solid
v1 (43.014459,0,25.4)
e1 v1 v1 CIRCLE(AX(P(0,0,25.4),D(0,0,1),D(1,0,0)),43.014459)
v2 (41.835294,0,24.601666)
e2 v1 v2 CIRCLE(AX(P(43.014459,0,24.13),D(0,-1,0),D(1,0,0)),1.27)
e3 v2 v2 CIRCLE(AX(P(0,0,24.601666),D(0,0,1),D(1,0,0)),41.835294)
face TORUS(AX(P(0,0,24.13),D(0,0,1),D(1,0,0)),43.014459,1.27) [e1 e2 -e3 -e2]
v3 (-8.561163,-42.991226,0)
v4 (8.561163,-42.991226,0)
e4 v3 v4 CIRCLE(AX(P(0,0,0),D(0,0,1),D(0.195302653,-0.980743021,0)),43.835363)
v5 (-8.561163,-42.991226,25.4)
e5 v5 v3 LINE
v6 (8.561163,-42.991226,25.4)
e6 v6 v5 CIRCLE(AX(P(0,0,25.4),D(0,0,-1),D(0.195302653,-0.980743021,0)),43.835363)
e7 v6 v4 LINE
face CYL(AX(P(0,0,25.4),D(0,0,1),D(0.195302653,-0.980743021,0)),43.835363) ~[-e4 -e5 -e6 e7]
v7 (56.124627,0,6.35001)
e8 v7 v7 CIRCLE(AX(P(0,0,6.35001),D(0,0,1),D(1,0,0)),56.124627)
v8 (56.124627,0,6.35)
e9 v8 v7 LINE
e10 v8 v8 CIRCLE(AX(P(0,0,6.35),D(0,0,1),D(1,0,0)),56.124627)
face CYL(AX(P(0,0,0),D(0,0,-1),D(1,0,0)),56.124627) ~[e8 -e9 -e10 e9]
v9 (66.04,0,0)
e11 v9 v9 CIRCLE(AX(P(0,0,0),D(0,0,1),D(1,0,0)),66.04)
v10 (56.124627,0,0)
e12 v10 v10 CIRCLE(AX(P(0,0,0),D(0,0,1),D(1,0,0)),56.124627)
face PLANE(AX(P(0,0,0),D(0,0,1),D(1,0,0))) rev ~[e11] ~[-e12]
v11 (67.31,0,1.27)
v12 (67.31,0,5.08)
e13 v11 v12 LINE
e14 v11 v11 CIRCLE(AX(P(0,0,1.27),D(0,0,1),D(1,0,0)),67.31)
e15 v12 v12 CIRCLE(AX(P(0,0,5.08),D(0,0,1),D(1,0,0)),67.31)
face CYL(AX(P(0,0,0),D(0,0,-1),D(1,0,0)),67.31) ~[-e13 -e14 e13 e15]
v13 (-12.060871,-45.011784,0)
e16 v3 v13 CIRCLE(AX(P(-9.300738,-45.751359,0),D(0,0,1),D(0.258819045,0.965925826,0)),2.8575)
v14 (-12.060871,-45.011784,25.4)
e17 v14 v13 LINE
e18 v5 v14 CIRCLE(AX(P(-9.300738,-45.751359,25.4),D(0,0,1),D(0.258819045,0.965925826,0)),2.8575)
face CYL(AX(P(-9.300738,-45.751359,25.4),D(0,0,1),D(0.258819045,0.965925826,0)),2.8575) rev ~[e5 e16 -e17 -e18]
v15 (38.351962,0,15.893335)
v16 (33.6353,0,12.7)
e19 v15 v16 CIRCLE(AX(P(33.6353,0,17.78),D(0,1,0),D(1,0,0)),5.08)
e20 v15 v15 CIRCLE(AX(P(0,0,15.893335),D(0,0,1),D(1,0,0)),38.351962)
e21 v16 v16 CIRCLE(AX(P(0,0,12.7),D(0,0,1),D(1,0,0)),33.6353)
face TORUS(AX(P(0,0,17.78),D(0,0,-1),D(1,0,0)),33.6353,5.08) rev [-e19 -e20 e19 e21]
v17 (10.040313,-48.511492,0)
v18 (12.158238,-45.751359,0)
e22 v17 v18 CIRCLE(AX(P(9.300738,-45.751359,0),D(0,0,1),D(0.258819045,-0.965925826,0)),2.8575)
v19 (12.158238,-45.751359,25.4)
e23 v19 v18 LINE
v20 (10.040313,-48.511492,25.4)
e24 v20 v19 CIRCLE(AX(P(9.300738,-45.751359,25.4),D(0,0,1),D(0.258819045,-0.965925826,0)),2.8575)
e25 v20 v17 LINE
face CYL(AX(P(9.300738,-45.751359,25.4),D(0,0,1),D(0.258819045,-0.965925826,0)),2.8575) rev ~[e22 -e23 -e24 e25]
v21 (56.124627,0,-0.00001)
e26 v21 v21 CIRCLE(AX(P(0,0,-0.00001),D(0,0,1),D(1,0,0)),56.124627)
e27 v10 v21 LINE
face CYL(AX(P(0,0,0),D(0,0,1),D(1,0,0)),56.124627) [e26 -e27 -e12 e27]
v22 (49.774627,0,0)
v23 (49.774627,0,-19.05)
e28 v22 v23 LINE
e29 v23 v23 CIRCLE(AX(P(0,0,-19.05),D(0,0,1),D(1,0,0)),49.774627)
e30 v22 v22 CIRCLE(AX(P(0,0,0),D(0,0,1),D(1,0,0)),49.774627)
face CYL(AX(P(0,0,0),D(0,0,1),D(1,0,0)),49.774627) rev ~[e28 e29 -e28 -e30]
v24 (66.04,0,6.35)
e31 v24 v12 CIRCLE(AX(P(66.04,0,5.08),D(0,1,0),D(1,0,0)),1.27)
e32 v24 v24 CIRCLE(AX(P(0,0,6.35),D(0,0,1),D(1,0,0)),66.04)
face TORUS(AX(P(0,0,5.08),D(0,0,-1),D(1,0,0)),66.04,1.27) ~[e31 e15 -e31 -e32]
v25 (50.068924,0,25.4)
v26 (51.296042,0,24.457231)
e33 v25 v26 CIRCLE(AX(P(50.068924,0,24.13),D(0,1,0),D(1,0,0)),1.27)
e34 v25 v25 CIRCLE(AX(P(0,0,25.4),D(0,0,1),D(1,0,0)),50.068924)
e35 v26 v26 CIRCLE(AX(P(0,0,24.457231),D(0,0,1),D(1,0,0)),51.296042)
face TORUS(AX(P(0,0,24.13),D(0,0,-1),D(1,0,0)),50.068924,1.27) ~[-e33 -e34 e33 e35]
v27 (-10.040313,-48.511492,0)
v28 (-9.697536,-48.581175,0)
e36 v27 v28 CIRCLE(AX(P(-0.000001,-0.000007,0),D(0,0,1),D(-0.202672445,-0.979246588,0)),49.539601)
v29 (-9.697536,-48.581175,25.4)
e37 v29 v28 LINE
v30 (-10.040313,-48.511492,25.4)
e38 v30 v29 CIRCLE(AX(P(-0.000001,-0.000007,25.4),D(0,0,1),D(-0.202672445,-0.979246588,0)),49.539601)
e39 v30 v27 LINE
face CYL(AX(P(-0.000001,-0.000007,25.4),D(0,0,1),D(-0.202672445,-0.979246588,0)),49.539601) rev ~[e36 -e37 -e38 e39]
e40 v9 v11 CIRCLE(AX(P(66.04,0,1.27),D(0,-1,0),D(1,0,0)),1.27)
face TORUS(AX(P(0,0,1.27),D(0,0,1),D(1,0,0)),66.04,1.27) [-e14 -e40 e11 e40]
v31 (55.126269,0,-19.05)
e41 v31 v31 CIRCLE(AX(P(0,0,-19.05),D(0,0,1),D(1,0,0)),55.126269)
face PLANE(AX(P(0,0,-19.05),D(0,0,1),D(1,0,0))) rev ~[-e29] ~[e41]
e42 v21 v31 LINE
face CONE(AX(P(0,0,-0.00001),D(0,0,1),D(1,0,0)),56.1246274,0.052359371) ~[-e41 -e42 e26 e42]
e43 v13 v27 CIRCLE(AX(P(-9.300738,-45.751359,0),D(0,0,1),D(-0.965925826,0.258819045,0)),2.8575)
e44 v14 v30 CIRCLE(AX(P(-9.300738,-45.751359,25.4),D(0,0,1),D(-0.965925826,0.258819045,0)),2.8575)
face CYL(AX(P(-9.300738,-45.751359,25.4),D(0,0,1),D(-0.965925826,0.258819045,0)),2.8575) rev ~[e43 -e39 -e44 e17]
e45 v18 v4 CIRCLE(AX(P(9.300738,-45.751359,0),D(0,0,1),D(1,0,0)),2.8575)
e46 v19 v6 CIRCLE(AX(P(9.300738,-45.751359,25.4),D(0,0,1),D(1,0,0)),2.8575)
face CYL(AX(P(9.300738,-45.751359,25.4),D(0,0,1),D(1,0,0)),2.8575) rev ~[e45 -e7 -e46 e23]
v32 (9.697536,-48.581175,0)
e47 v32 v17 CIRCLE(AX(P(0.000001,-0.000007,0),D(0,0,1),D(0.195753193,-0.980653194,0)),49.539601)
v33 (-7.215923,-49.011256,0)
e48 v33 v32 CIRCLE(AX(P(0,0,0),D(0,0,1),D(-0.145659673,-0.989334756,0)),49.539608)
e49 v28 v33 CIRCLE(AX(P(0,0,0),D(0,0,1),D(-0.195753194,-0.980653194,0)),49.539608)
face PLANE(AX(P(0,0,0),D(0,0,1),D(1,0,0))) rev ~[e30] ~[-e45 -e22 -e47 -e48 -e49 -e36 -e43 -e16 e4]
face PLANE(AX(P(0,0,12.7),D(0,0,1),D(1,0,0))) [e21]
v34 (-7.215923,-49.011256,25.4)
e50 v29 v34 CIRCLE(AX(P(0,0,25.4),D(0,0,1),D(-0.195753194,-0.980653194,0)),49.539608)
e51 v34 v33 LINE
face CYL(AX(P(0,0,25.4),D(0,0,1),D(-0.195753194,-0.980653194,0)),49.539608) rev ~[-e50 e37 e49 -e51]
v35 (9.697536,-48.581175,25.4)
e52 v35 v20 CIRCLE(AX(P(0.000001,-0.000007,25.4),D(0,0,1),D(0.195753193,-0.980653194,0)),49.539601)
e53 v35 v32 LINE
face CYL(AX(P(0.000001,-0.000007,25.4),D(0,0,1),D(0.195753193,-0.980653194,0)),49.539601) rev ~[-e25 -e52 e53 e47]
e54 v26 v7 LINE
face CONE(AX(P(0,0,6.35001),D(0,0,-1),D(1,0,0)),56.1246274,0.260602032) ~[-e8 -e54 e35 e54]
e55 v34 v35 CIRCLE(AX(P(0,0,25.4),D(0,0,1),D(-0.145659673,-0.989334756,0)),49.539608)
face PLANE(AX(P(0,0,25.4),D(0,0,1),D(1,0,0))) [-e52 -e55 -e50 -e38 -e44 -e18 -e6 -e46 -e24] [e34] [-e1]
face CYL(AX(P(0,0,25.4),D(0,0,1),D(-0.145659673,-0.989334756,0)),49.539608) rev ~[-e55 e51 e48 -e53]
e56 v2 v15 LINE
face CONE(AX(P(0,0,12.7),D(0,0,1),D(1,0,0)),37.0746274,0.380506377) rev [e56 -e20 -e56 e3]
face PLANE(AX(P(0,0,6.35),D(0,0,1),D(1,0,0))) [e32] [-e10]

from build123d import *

# Parameters (mm, degrees)
F0_R     = 67.31
F0_R_2   = 56.1246274
F1_DEPTH = 6.35
F0_R_3   = 49.7746274
F2_DEPTH = 19.05
F0_R_4   = 43.4246274
F0_R_5   = 37.0746274
F3_DEPTH = 25.4
F4_SIZE2 = 0.998358
F4_SIZE  = 19.04999
F5_SIZE2 = 19.04999
F5_SIZE  = 5.07999
F6_SIZE2 = 12.7
F6_SIZE  = 5.08
F7_DEPTH = 12.7
F9_DEPTH = 127
F10_R    = 1.27
F11_R    = 5.08


# Not quite as in the source:
# - a fillet or chamfer is up to 0.001 mm smaller than in the source, because OpenCascade refuses the exact size


with BuildPart() as f1:
    # F0 (on Top) → F1 (new body)
    with BuildSketch(Plane.XY):
        Circle(F0_R)
        Circle(F0_R_2, mode=Mode.SUBTRACT)
    extrude(amount=F1_DEPTH)



with BuildPart() as f2:
    # F0 (on Top) → F2 (new body)
    with BuildSketch(Plane.XY):
        Circle(F0_R_2)
        Circle(F0_R_3, mode=Mode.SUBTRACT)
    extrude(amount=-F2_DEPTH)


with BuildPart() as f1_1:
    add(f1.part)

    add(f2.part)  # F3 merges F2
    # F0 (on Top) → F3 (join)
    with BuildSketch(Plane.XY):
        Circle(F0_R_2)
        Circle(F0_R_3, mode=Mode.SUBTRACT)
        Circle(F0_R_3)
        Circle(F0_R_4, mode=Mode.SUBTRACT)
        Circle(F0_R_4)
        Circle(F0_R_5, mode=Mode.SUBTRACT)
    extrude(amount=F3_DEPTH)

    # F4 (size 19.05 and 0.9983681953 in the source; OpenCascade refuses exactly that, so slightly less here)
    f4_edges = [f1_1.edges().sort_by_distance(p)[0] for p in [
        (-56.124627, 0, -19.05),
    ]]
    f4_side = f1_1.faces().sort_by_distance((-56.124627, 0, -9.525))[0]
    chamfer(f4_edges, length=F4_SIZE, length2=F4_SIZE2, reference=f4_side)

    # F5 (size 5.08 and 19.05 in the source; OpenCascade refuses exactly that, so slightly less here)
    f5_edges = [f1_1.edges().sort_by_distance(p)[0] for p in [
        (-56.124627, 0, 25.4),
    ]]
    f5_side = f1_1.faces().sort_by_distance((-54.537183, 0, 25.4))[0]
    chamfer(f5_edges, length=F5_SIZE, length2=F5_SIZE2, reference=f5_side)

    # F6
    f6_edges = [f1_1.edges().sort_by_distance(p)[0] for p in [
        (-37.074627, 0, 25.4),
    ]]
    f6_side = f1_1.faces().sort_by_distance((-49.600877, 0, 25.4))[0]
    chamfer(f6_edges, length=F6_SIZE, length2=F6_SIZE2, reference=f6_side)

    # F0 (on Top) → F7 (join)
    with BuildSketch(Plane.XY):
        Circle(F0_R_5)
    extrude(amount=F7_DEPTH)

    # F8 (on face) → F9 (cut)
    with BuildSketch(Plane.XY.offset(25.4)):
        with BuildLine():
            ThreePointArc((-8.5611625958, -42.9912259739), (-10.7294880172, -43.2766914312), (-12.0608710658, -45.0117836011))
            Line((-12.0608710658, -45.0117836011), (-9.3007380172, -45.7513590225))
            Line((-9.3007380172, -45.7513590225), (-6.5406049686, -46.4909344439))
            ThreePointArc((-6.5406049686, -46.4909344439), (-6.4676843258, -46.1243376168), (-6.4432380172, -45.7513590225))
            ThreePointArc((-6.4432380172, -45.7513590225), (-7.0337308473, -44.0118232391), (-8.5611625958, -42.9912259739))
        make_face()
        with BuildLine():
            ThreePointArc((8.5611625958, -42.9912259739), (0, -43.8353626166), (-8.5611625958, -42.9912259739))
            Line((-8.5611625958, -42.9912259739), (-5.8010295472, -43.7308013952))
            Line((-5.8010295472, -43.7308013952), (-6.5406049686, -46.4909344439))
            Line((-6.5406049686, -46.4909344439), (-7.215923084, -49.0112559618))
            ThreePointArc((-7.215923084, -49.0112559618), (1.2593028677, -49.5235995582), (9.6975364764, -48.581174782))
            ThreePointArc((9.6975364764, -48.581174782), (6.5005137528, -46.3206132005), (8.5611625958, -42.9912259739))
        make_face()
        with BuildLine():
            Line((-9.3007380172, -45.7513590225), (-12.0608710658, -45.0117836011))
            ThreePointArc((-12.0608710658, -45.0117836011), (-11.7754056085, -47.1801090225), (-10.0403134386, -48.5114920711))
            ThreePointArc((-10.0403134386, -48.5114920711), (-9.8689864594, -48.5466359615), (-9.6975364764, -48.581174782))
            ThreePointArc((-9.6975364764, -48.581174782), (-7.7232039405, -48.1339400782), (-6.5406049686, -46.4909344439))
            Line((-6.5406049686, -46.4909344439), (-9.3007380172, -45.7513590225))
        make_face()
        with BuildLine():
            Line((-5.8010295472, -43.7308013952), (-8.5611625958, -42.9912259739))
            ThreePointArc((-8.5611625958, -42.9912259739), (-7.0337308473, -44.0118232391), (-6.4432380172, -45.7513590225))
            ThreePointArc((-6.4432380172, -45.7513590225), (-6.4676843258, -46.1243376168), (-6.5406049686, -46.4909344439))
            Line((-6.5406049686, -46.4909344439), (-5.8010295472, -43.7308013952))
        make_face()
        with BuildLine():
            ThreePointArc((-6.5406049686, -46.4909344439), (-7.7232039405, -48.1339400782), (-9.6975364764, -48.581174782))
            ThreePointArc((-9.6975364764, -48.581174782), (-8.4594634008, -48.8119886491), (-7.215923084, -49.0112559618))
            Line((-7.215923084, -49.0112559618), (-6.5406049686, -46.4909344439))
        make_face()
        with BuildLine():
            ThreePointArc((12.1582380172, -45.7513590225), (11.0402738006, -43.4843518526), (8.5611625958, -42.9912259739))
            ThreePointArc((8.5611625958, -42.9912259739), (6.5005137528, -46.3206132005), (9.6975364764, -48.581174782))
            ThreePointArc((9.6975364764, -48.581174782), (9.8689864594, -48.5466359615), (10.0403134386, -48.5114920711))
            ThreePointArc((10.0403134386, -48.5114920711), (11.5677451871, -47.4908948059), (12.1582380172, -45.7513590225))
        make_face()
    extrude(amount=-F9_DEPTH, mode=Mode.SUBTRACT)

    # F10
    f10_edges = [f1_1.edges().sort_by_distance(p)[0] for p in [
        (-67.31, 0, 6.35),
        (-51.044637, 0, 25.4),
        (-67.31, 0, 0),
        (-42.154627, 0, 25.4),
    ]]
    fillet(f10_edges, radius=F10_R)

    # F11
    f11_edges = [f1_1.edges().sort_by_distance(p)[0] for p in [
        (-37.074627, 0, 12.7),
    ]]
    fillet(f11_edges, radius=F11_R)


solid = f1_1.part
